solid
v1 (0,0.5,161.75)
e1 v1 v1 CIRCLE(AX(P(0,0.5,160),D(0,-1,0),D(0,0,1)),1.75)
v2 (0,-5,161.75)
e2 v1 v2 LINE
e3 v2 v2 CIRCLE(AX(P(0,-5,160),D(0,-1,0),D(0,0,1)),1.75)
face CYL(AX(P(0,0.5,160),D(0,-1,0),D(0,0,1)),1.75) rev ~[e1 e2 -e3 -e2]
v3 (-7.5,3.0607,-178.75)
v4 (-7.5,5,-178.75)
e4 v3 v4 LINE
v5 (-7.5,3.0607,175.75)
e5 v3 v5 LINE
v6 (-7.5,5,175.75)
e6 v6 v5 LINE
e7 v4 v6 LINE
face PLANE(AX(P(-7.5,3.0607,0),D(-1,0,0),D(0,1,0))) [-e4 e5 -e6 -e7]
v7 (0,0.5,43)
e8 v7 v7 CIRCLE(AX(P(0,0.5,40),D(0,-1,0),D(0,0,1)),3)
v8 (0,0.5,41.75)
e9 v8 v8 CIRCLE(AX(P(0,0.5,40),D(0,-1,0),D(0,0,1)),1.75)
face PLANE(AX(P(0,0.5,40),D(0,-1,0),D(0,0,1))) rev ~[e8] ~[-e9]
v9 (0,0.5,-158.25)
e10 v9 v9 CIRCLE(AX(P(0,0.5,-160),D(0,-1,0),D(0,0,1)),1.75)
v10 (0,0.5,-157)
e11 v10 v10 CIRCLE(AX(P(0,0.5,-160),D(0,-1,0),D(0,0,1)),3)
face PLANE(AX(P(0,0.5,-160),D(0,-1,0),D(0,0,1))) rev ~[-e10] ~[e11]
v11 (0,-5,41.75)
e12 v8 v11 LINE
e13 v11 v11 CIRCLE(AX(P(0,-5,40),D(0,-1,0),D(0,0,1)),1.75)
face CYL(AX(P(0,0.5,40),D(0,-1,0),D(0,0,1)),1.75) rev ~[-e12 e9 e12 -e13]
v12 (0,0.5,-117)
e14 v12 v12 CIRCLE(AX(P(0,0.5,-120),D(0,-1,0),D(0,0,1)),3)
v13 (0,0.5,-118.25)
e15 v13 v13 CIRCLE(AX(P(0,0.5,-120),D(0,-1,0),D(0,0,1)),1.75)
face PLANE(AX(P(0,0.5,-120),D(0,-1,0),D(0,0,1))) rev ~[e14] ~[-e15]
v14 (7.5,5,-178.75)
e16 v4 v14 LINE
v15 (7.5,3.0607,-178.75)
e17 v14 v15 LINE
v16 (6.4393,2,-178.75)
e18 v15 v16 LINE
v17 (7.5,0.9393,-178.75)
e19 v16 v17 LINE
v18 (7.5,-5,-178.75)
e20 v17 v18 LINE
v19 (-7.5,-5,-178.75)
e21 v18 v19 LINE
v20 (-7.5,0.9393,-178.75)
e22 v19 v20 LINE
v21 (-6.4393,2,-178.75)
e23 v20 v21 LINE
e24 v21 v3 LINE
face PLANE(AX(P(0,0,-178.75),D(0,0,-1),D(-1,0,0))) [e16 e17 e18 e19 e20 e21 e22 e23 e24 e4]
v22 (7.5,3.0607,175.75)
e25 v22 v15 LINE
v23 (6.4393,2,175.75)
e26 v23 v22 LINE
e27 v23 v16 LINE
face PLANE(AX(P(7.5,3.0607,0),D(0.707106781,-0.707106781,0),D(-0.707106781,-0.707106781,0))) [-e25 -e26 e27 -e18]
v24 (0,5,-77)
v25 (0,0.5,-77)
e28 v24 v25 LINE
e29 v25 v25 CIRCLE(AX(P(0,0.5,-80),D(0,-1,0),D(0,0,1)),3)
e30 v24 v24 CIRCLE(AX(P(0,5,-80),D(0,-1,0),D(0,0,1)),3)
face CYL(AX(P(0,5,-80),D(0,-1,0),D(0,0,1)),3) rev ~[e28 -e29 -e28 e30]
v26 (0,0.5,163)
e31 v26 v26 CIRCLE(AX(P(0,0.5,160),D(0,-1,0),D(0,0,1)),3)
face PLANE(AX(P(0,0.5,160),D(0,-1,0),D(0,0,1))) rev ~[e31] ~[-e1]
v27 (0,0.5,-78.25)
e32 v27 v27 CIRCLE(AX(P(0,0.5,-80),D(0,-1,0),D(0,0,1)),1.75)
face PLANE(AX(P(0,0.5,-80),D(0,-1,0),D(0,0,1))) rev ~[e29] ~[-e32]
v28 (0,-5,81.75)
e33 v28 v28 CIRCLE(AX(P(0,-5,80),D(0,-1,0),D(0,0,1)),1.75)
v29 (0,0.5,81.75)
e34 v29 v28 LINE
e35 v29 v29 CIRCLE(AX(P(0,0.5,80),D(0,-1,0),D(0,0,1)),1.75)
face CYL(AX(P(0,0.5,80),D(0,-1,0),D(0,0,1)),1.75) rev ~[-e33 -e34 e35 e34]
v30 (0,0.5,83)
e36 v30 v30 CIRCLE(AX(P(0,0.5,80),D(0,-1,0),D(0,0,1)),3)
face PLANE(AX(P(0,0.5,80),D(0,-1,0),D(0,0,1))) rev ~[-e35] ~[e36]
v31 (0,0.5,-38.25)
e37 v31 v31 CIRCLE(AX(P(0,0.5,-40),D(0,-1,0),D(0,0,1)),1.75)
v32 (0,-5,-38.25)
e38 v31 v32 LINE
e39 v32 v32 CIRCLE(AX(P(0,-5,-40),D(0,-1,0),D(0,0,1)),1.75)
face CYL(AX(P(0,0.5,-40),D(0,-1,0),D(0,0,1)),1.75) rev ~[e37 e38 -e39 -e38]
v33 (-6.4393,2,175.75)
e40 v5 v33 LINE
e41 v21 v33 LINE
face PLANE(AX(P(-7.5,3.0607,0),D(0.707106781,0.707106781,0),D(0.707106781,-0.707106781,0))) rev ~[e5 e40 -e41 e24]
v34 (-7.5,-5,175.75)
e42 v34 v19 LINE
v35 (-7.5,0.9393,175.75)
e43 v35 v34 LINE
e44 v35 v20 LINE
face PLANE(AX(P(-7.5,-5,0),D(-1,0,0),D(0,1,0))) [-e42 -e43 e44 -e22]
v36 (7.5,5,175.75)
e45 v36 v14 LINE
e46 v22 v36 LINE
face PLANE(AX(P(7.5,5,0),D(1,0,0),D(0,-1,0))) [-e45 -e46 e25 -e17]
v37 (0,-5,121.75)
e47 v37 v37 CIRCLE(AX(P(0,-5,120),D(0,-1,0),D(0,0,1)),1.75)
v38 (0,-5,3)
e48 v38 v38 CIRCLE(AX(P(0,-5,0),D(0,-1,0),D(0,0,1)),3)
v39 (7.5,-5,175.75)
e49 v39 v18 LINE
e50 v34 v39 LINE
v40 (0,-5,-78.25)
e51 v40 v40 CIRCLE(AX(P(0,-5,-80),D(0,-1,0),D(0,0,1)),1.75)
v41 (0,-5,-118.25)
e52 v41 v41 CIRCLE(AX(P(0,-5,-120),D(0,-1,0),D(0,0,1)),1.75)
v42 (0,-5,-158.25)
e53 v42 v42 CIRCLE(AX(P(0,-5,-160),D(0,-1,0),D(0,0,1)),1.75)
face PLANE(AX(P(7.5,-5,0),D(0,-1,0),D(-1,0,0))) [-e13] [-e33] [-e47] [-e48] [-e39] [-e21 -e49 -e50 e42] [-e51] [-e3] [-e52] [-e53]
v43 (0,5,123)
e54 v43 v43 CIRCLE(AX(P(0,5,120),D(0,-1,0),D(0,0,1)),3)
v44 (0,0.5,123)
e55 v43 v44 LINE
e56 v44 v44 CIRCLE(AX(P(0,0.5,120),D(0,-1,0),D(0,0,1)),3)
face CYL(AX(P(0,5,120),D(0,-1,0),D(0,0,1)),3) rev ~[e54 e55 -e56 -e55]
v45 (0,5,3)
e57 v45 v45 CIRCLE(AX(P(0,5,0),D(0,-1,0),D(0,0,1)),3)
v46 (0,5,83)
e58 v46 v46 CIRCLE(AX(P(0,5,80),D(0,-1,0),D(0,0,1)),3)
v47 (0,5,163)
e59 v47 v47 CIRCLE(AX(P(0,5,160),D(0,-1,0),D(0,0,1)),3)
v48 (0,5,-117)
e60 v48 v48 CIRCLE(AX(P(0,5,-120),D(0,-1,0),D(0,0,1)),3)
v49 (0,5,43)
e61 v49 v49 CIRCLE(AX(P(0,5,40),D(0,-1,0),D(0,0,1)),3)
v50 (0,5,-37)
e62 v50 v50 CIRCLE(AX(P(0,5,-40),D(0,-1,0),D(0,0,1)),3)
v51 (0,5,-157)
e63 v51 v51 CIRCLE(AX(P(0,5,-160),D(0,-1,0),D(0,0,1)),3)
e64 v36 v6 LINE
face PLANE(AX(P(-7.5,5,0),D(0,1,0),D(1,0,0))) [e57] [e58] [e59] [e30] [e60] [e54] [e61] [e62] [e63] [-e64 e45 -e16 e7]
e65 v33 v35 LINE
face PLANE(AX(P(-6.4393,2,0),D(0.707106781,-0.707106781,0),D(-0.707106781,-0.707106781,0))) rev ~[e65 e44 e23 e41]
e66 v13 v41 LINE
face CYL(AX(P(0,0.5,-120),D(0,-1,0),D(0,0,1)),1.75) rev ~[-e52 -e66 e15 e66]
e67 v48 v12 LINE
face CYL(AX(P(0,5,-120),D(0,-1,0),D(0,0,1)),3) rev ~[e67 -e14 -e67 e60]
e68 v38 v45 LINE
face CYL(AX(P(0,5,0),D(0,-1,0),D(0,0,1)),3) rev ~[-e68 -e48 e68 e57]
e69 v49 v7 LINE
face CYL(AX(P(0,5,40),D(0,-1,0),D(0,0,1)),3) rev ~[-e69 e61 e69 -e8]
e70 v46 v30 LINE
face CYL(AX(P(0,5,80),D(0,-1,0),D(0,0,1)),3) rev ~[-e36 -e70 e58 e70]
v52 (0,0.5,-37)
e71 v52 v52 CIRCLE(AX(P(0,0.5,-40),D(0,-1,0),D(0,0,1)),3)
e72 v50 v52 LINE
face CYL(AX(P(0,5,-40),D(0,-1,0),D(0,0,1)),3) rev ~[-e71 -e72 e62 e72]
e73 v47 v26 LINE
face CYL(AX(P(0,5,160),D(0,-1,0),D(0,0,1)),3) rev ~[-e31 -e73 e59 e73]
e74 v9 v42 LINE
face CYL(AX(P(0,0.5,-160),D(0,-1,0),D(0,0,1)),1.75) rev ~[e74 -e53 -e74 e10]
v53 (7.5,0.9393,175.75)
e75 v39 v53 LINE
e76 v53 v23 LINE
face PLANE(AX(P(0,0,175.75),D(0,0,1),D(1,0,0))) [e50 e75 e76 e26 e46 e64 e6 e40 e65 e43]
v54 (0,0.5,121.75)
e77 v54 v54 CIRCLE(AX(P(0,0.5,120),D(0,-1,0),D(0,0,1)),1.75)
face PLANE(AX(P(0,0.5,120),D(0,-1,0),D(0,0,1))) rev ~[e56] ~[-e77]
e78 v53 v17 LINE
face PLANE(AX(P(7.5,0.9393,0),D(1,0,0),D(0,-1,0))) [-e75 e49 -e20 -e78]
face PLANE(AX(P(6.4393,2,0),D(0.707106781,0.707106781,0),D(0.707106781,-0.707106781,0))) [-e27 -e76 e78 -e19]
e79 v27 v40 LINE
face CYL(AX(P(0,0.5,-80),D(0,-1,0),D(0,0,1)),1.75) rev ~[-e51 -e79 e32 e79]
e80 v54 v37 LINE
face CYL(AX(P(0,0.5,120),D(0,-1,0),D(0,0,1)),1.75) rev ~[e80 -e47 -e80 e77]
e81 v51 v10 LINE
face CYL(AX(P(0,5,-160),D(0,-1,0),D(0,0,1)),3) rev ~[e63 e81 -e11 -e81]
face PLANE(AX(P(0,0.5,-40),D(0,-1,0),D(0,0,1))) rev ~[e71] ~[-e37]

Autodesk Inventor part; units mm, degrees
ref_plane "YZ Plane" through (0, 0, 0) normal (1, 0, 0) x (0, 1, 0)
ref_plane "XZ Plane" through (0, 0, 0) normal (0, 1, 0) x (-1, 0, 0)
ref_plane "XY Plane" through (0, 0, 0) normal (0, 0, 1) x (1, 0, 0)
sketch "Sketch1" plane through (0, 0, 0) normal (0, 0, 1) x (1, 0, 0)
  line L0 (-7.5, 5) -> (7.5, 5)
  line L1 (7.5, 5) -> (7.5, -5)
  line L2 (7.5, -5) -> (-7.5, -5)
  line L3 (-7.5, -5) -> (-7.5, 5)
  line L4 (-7.5, 5) -> (7.5, -5) construction
  line L5 (7.5, 5) -> (-7.5, -5) construction
  line L6 (-7.5, 3.0607) -> (-6.4393, 2)
  line L7 (-7.5, 3.0607) -> (-6, 3.0607) construction
  line L8 (-6.4393, 2) -> (-7.5, 0.9393)
  line L9 (0, 5) -> (0, -5) construction
  line L10 (7.5, 3.0607) -> (6.4393, 2)
  line L11 (6.4393, 2) -> (7.5, 0.9393)
  point P0 (0, 0)
  point P1 (7.5, 0.9393)
  point P2 (7.5, 3.0607)
  dimension "d0" = 15
  dimension "d1" = 10
  dimension "d2" = 45
  dimension "d3" = 3
  dimension "d4" = 1.5
extrude "Extrusion1" add sketch "Sketch1" along normal mid plane 360 contours L0 L1 L10 L11 L2 L3 L8 L6
sketch "Sketch2" plane through (-7.5, 5, 180) normal (0, 1, 0) x (1, 0, 0)
  point P0 (7.5, 180)
  point P1 (7.5, 180)
hole "Hole1" at (0, 5, 0) direction (0, -1, 0) diameter 3.5 end through all counterbore diameter 6 counterbore depth 4.5
pattern_linear "Rectangular Pattern1" count 9 spacing 40 along (0, 0, 1) of "Hole1" first direction both ways yes
sketch "Sketch3" plane through (-7.5, 5, 180) normal (0, 1, 0) x (1, 0, 0)
  point P0 (7.5, 180)
  point P1 (7.5, 180)
hole "Hole2" at (0, 5, 0) direction (0, -1, 0) diameter 6 end through all
sketch "Sketch4" plane through (0, 0, 180) normal (0, 0, 1) x (1, 0, 0)
  line L0 (-7.5, 5) -> (-7.5, 3.0607) projected
  line L1 (-7.5, 3.0607) -> (-6.4393, 2) projected
  line L2 (-6.4393, 2) -> (-7.5, 0.9393) projected
  line L3 (-7.5, 0.9393) -> (-7.5, -5) projected
  line L4 (-7.5, -5) -> (7.5, -5) projected
  line L5 (7.5, -5) -> (7.5, 0.9393) projected
  line L6 (7.5, 0.9393) -> (6.4393, 2) projected
  line L7 (6.4393, 2) -> (7.5, 3.0607) projected
  line L8 (7.5, 3.0607) -> (7.5, 5) projected
  line L9 (7.5, 5) -> (-7.5, 5) projected
  point P0 (0, 0)
extrude "Extrusion2" cut sketch "Sketch4" against normal blind 4.25
sketch "Sketch5" plane through (0, 0, -180) normal (0, 0, -1) x (-1, 0, 0)
  line L0 (7.5, 3.0607) -> (7.5, 5) projected
  line L1 (7.5, 5) -> (-7.5, 5) projected
  line L2 (-7.5, 5) -> (-7.5, 3.0607) projected
  line L3 (-7.5, 3.0607) -> (-6.4393, 2) projected
  line L4 (-6.4393, 2) -> (-7.5, 0.9393) projected
  line L5 (-7.5, 0.9393) -> (-7.5, -5) projected
  line L6 (-7.5, -5) -> (7.5, -5) projected
  line L7 (7.5, -5) -> (7.5, 0.9393) projected
  line L8 (7.5, 0.9393) -> (6.4393, 2) projected
  line L9 (6.4393, 2) -> (7.5, 3.0607) projected
  point P0 (0, 0)
extrude "Extrusion3" cut sketch "Sketch5" against normal blind 1.25
properties part number "MGN15 Rail" material "Stainless Steel, 440C"
